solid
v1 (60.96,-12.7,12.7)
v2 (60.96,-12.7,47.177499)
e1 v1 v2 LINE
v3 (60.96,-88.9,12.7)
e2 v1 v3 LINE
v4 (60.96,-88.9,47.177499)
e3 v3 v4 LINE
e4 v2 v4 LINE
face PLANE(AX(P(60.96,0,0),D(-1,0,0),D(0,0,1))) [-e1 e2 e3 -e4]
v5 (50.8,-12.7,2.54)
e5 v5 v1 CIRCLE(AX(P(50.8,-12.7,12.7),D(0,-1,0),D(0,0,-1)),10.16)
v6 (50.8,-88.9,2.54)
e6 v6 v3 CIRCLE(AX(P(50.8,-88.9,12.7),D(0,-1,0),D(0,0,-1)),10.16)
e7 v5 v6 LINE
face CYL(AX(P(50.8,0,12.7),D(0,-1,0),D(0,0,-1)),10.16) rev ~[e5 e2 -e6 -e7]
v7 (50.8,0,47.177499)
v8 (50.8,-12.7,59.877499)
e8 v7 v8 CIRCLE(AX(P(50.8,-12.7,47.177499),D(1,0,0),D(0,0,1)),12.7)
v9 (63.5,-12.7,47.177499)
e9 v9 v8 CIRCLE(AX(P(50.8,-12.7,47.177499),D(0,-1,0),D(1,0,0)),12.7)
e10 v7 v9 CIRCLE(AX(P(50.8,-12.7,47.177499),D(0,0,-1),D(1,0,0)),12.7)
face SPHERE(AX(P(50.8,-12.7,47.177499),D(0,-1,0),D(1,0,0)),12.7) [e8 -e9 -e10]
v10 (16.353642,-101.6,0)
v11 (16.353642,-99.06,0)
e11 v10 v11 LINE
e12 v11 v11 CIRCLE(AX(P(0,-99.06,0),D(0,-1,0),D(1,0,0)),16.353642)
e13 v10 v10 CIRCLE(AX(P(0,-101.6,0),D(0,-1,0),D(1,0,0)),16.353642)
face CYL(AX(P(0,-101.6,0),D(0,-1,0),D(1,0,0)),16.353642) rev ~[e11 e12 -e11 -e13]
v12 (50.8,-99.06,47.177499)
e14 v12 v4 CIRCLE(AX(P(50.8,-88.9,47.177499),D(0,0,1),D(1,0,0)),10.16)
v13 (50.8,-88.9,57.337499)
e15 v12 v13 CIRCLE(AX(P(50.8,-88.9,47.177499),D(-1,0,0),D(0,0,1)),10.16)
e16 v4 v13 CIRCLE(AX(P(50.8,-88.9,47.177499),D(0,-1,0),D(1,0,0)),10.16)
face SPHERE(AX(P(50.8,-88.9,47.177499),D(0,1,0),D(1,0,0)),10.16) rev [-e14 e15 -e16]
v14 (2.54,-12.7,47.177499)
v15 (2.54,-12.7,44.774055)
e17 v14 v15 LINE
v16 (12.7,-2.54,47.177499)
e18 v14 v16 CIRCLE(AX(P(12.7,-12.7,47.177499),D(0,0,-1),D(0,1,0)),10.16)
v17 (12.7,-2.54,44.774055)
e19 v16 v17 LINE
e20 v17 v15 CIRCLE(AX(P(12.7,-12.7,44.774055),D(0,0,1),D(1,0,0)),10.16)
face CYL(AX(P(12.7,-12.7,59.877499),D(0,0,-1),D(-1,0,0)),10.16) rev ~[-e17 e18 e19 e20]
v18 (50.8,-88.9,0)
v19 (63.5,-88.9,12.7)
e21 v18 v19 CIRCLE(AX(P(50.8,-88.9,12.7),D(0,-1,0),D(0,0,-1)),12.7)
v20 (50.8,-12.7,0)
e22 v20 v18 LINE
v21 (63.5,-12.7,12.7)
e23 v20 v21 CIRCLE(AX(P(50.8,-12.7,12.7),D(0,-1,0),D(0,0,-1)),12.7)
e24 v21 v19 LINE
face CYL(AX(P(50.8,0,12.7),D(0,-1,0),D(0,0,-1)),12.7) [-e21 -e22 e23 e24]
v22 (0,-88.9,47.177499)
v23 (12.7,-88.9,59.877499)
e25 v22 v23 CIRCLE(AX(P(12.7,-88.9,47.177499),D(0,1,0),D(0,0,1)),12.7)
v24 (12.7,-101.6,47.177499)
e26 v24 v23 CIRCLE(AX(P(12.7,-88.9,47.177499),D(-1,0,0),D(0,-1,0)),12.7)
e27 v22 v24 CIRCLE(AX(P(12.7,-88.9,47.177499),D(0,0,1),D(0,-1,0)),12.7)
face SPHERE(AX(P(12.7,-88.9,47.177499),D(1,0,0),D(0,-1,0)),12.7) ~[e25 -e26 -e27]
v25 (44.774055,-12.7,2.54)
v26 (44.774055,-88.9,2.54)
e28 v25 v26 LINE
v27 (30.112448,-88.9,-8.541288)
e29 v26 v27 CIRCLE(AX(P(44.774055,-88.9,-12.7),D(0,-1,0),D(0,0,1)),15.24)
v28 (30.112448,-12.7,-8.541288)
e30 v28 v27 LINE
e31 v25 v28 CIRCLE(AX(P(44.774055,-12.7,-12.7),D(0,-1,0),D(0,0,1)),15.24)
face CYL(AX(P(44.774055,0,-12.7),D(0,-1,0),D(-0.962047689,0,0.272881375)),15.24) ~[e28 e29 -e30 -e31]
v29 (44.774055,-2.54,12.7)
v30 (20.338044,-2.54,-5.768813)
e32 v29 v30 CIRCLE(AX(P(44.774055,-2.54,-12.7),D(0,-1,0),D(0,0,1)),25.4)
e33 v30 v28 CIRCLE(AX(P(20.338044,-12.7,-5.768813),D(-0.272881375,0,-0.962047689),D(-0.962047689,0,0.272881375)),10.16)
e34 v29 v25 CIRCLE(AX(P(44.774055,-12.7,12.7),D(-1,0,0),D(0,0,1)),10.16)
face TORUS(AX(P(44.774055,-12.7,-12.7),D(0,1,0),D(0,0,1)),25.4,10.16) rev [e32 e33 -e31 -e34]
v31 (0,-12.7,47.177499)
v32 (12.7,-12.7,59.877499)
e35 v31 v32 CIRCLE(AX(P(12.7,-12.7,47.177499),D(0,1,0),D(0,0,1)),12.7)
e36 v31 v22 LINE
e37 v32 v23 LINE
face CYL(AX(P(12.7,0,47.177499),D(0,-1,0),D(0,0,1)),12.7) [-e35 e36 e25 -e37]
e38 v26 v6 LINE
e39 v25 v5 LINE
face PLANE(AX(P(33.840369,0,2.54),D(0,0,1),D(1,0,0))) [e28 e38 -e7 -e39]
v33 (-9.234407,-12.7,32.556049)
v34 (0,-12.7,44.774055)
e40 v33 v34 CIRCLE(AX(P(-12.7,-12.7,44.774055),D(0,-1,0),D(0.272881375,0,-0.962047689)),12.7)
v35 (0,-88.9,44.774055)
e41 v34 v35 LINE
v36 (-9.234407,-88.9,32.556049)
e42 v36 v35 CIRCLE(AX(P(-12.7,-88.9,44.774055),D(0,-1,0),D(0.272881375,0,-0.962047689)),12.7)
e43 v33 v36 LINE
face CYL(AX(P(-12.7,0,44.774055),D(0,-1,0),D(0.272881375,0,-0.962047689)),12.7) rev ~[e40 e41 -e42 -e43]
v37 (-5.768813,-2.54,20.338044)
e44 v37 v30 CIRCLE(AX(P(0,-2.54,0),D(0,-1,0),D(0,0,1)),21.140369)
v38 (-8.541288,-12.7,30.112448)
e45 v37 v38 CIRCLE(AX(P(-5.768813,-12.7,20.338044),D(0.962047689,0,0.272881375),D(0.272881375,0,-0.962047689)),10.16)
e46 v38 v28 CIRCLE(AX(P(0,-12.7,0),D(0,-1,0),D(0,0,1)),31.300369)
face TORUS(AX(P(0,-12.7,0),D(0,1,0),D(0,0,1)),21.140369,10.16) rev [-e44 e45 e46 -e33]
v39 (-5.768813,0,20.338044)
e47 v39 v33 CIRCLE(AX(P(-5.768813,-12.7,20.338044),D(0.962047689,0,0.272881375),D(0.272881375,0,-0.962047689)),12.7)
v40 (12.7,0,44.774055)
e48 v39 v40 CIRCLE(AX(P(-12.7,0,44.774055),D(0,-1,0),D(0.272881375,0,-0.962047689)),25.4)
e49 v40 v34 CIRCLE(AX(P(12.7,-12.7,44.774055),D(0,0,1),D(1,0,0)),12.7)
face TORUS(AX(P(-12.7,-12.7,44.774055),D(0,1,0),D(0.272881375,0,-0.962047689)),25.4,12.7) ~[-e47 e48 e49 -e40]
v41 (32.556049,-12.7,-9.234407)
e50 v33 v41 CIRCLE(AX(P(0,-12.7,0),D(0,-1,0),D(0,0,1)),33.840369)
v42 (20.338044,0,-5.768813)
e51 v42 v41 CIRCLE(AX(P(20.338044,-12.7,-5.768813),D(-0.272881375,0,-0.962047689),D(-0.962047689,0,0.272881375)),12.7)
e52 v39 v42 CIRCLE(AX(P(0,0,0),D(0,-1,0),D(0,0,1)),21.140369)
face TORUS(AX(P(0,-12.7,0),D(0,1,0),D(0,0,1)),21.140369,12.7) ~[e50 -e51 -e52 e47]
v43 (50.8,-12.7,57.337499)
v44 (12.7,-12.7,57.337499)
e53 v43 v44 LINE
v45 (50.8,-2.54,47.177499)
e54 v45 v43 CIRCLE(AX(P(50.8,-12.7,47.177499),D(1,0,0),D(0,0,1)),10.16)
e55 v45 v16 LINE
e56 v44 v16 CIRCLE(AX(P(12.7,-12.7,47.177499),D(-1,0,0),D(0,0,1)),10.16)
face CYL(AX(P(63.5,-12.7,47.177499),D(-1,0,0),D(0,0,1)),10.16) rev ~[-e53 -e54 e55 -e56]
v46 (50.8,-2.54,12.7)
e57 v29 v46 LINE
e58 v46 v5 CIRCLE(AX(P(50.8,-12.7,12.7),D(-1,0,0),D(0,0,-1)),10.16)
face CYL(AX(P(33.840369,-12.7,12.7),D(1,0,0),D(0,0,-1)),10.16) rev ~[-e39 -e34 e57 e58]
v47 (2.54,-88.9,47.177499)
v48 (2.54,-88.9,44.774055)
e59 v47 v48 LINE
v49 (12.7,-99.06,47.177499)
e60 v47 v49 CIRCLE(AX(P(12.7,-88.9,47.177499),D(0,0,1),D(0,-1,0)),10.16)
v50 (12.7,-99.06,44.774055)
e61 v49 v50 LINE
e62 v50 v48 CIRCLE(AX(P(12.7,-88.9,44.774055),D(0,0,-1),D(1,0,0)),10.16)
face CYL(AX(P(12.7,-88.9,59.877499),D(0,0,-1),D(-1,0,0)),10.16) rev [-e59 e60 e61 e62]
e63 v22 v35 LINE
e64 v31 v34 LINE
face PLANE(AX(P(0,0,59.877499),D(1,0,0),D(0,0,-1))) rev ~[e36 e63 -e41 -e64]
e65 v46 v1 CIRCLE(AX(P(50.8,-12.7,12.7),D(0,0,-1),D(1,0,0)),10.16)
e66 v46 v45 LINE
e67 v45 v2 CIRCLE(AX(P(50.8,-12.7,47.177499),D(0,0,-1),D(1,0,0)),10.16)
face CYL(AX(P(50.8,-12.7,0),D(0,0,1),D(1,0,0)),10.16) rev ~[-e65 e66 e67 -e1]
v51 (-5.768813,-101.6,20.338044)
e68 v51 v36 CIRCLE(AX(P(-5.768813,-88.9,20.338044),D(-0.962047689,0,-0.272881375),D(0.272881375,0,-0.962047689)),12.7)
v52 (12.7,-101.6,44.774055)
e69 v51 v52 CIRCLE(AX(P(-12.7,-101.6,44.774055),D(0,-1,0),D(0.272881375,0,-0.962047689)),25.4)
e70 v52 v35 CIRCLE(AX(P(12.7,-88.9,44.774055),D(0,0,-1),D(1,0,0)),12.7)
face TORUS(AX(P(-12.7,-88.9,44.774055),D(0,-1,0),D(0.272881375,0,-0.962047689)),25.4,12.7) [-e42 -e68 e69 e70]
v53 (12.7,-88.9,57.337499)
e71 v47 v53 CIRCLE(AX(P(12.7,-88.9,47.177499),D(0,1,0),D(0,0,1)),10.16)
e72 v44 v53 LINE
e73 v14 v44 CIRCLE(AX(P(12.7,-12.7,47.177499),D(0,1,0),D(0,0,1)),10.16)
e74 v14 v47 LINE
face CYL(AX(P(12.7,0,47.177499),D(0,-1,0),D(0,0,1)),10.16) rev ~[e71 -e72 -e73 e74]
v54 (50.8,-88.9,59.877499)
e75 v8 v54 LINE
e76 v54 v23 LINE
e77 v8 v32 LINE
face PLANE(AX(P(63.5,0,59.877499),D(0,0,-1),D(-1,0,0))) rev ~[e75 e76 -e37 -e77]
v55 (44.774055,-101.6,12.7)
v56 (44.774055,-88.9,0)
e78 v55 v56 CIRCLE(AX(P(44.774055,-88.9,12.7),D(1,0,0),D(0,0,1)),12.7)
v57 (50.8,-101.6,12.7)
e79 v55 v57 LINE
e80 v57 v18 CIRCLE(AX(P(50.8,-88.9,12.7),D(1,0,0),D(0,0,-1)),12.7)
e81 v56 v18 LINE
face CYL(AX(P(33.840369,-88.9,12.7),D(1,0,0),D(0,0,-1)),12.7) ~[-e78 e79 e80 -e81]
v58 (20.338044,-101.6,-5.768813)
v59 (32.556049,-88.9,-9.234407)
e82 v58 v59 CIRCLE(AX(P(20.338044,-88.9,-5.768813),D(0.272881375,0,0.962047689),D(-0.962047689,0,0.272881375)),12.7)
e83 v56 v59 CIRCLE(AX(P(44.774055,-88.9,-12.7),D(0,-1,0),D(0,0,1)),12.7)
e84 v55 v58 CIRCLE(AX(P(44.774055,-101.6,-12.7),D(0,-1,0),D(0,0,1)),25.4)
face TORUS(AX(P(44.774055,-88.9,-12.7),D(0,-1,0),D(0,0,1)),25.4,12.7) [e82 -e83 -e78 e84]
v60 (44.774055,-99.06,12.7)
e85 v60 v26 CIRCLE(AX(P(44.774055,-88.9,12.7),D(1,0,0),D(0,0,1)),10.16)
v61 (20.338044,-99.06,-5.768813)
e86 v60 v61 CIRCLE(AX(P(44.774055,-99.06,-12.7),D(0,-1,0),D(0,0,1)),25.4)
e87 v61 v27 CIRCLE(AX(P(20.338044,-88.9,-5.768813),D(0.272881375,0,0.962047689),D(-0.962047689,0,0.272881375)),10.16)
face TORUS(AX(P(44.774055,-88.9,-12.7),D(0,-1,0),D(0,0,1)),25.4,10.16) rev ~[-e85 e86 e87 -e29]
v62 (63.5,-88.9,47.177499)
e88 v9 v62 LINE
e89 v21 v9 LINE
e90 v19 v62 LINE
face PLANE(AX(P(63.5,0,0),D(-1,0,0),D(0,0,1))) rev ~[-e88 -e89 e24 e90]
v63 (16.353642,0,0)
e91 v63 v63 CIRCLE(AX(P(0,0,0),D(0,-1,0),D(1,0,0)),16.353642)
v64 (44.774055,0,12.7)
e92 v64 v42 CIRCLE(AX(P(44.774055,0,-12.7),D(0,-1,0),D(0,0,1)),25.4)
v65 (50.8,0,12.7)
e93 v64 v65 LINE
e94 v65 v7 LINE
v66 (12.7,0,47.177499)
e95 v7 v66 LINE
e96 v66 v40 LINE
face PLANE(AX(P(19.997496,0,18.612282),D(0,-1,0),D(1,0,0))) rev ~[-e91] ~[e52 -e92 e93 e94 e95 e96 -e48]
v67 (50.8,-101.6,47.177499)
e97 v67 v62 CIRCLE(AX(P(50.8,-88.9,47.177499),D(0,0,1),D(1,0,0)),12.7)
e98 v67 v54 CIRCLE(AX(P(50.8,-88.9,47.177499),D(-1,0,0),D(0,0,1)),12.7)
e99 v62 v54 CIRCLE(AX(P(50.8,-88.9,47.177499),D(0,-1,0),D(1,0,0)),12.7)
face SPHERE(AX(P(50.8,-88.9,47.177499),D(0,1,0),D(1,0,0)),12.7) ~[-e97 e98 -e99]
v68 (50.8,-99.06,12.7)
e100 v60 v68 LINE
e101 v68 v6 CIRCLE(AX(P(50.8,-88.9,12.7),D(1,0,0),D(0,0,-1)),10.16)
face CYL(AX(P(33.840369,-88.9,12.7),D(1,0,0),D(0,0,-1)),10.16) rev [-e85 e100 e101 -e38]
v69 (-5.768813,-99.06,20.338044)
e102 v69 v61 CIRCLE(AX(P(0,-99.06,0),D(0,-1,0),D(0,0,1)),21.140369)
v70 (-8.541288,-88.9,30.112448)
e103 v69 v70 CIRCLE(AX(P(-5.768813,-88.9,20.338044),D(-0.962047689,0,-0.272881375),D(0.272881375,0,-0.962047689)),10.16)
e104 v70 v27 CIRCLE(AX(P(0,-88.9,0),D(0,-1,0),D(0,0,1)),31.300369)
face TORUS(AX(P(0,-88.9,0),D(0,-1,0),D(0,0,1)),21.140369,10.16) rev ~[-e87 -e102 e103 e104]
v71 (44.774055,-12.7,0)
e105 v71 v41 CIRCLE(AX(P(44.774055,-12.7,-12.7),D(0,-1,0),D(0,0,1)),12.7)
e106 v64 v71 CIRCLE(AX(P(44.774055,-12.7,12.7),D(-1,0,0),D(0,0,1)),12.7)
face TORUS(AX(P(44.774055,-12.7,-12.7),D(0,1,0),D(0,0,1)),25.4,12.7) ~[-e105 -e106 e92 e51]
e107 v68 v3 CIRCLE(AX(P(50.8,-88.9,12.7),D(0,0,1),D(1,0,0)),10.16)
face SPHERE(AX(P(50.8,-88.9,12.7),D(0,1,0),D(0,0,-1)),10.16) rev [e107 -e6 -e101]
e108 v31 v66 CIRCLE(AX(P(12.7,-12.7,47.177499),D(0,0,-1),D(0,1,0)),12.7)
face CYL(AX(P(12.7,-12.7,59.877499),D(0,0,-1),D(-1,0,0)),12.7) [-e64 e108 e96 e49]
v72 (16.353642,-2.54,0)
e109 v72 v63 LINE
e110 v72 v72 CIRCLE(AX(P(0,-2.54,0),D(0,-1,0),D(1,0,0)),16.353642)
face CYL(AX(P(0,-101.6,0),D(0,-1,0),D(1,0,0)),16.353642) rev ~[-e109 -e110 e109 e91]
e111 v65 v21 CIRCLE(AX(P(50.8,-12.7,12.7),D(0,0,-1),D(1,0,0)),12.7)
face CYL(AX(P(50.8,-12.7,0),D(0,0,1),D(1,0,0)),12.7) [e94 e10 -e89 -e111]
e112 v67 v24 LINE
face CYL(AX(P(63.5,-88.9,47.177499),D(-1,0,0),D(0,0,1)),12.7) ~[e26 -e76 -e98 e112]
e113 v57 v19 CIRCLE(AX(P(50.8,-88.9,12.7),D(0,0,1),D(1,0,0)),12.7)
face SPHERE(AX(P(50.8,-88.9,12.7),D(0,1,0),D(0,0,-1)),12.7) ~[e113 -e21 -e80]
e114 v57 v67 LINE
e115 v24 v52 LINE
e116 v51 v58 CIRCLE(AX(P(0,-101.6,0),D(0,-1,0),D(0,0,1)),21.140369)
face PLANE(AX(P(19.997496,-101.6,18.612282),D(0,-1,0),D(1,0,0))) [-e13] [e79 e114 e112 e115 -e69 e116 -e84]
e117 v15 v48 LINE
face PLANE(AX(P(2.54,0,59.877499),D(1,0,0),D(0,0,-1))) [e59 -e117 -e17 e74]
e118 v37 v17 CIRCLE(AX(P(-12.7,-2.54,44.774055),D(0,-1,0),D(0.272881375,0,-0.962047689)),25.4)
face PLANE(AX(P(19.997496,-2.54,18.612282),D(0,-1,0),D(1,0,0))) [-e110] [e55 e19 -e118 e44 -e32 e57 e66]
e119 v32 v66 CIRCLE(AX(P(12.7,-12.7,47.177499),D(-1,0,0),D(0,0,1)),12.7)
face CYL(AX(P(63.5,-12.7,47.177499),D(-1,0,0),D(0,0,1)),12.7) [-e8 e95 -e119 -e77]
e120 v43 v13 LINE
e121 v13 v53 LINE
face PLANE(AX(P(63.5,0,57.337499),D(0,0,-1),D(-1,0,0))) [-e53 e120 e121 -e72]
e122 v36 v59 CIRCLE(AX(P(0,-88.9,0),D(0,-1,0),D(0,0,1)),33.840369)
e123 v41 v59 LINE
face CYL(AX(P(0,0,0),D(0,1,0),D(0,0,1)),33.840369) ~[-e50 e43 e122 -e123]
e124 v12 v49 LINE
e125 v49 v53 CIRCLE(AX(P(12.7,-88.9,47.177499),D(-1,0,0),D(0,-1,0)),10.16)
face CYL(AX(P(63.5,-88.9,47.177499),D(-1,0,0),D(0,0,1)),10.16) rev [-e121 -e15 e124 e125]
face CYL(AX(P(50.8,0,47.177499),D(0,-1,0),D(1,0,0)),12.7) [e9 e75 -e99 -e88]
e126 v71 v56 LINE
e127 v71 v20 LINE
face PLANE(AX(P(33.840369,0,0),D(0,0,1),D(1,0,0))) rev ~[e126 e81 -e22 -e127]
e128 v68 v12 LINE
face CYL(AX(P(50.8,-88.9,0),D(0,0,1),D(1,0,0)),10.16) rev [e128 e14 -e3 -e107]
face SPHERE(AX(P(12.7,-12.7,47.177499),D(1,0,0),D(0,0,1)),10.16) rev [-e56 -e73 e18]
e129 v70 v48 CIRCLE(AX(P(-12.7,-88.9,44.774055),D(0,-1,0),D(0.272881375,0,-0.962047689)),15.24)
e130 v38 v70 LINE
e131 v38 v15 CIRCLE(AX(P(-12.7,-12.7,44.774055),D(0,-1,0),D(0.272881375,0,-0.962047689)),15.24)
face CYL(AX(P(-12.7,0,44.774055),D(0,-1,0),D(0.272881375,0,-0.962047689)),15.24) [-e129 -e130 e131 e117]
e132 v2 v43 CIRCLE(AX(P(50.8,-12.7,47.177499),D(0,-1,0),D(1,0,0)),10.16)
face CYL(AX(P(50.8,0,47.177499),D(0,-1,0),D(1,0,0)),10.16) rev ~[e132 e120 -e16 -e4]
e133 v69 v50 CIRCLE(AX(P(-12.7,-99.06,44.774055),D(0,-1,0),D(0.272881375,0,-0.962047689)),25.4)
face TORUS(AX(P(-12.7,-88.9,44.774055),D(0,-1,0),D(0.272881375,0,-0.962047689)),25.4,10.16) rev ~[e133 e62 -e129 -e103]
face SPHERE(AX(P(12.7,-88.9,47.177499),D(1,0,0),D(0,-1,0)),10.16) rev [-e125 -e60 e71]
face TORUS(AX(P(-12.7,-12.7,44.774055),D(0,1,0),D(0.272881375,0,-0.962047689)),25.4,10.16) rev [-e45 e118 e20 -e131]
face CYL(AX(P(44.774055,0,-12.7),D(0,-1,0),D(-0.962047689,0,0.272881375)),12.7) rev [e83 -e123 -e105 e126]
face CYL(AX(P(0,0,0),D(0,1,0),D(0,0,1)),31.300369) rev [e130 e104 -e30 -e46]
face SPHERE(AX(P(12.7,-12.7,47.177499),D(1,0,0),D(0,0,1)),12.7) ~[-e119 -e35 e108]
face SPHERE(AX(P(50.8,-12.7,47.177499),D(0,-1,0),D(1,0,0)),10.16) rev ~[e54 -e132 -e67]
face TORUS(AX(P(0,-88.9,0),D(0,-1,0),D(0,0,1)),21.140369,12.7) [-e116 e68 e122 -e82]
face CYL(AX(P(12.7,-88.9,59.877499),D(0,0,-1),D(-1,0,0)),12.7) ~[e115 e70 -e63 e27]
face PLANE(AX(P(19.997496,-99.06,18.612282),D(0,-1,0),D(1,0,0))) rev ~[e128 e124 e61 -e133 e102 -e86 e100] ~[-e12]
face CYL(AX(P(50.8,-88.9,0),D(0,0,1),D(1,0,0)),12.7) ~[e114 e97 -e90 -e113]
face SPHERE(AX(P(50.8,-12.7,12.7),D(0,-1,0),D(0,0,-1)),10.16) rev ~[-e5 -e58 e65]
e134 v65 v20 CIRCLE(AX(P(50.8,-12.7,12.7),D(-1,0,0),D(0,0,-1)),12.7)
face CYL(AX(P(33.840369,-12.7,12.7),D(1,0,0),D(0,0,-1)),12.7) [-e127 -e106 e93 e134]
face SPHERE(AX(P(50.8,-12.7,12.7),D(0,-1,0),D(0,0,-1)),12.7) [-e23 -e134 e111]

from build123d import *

# Parameters (mm, degrees)
F1_DEPTH = 101.6
F2_R     = 12.7
F3_R     = 16.353641652
F4_DEPTH = 101.601
F5_T     = -2.54


with BuildPart() as f1:
    # F0 (on Front) → F1 (new body)
    with BuildSketch(Plane.XZ):
        with BuildLine():
            ThreePointArc((0, 33.8403694774), (-23.9287547353, -23.9287547353), (33.8403694774, 0))
            Line((33.8403694774, 0), (63.5, 0))
            Line((63.5, 0), (63.5, 59.877499095))
            Line((63.5, 59.877499095), (0, 59.877499095))
            Line((0, 59.877499095), (0, 33.8403694774))
        make_face()
    extrude(amount=F1_DEPTH)

    # F2
    f2_edges = [f1.edges().sort_by_distance(p)[0] for p in [
        (63.5, -50.8, 59.877499),
        (33.840369, -50.8, 0),
        (63.5, -50.8, 0),
        (48.670185, 0, 0),
        (48.670185, -101.6, 0),
        (63.5, -101.6, 29.93875),
        (-23.928755, -101.6, -23.928755),
        (31.75, -101.6, 59.877499),
        (0, -101.6, 46.858934),
        (63.5, 0, 29.93875),
        (31.75, 0, 59.877499),
        (0, -50.8, 59.877499),
        (0, 0, 46.858934),
        (0, -50.8, 33.840369),
        (-23.928755, 0, -23.928755),
    ]]
    fillet(f2_edges, radius=F2_R)

    # F3 (on face) → F4 (cut, through all)
    with BuildSketch(Plane.XZ.offset(101.6)):
        Circle(F3_R)
    extrude(amount=-F4_DEPTH, mode=Mode.SUBTRACT)

    # F5
    f5_openings = [f1.faces().sort_by_distance(p)[0] for p in [
        (-16.353642, -50.8, 0),
    ]]
    offset(amount=F5_T, openings=f5_openings)


solid = f1.part
